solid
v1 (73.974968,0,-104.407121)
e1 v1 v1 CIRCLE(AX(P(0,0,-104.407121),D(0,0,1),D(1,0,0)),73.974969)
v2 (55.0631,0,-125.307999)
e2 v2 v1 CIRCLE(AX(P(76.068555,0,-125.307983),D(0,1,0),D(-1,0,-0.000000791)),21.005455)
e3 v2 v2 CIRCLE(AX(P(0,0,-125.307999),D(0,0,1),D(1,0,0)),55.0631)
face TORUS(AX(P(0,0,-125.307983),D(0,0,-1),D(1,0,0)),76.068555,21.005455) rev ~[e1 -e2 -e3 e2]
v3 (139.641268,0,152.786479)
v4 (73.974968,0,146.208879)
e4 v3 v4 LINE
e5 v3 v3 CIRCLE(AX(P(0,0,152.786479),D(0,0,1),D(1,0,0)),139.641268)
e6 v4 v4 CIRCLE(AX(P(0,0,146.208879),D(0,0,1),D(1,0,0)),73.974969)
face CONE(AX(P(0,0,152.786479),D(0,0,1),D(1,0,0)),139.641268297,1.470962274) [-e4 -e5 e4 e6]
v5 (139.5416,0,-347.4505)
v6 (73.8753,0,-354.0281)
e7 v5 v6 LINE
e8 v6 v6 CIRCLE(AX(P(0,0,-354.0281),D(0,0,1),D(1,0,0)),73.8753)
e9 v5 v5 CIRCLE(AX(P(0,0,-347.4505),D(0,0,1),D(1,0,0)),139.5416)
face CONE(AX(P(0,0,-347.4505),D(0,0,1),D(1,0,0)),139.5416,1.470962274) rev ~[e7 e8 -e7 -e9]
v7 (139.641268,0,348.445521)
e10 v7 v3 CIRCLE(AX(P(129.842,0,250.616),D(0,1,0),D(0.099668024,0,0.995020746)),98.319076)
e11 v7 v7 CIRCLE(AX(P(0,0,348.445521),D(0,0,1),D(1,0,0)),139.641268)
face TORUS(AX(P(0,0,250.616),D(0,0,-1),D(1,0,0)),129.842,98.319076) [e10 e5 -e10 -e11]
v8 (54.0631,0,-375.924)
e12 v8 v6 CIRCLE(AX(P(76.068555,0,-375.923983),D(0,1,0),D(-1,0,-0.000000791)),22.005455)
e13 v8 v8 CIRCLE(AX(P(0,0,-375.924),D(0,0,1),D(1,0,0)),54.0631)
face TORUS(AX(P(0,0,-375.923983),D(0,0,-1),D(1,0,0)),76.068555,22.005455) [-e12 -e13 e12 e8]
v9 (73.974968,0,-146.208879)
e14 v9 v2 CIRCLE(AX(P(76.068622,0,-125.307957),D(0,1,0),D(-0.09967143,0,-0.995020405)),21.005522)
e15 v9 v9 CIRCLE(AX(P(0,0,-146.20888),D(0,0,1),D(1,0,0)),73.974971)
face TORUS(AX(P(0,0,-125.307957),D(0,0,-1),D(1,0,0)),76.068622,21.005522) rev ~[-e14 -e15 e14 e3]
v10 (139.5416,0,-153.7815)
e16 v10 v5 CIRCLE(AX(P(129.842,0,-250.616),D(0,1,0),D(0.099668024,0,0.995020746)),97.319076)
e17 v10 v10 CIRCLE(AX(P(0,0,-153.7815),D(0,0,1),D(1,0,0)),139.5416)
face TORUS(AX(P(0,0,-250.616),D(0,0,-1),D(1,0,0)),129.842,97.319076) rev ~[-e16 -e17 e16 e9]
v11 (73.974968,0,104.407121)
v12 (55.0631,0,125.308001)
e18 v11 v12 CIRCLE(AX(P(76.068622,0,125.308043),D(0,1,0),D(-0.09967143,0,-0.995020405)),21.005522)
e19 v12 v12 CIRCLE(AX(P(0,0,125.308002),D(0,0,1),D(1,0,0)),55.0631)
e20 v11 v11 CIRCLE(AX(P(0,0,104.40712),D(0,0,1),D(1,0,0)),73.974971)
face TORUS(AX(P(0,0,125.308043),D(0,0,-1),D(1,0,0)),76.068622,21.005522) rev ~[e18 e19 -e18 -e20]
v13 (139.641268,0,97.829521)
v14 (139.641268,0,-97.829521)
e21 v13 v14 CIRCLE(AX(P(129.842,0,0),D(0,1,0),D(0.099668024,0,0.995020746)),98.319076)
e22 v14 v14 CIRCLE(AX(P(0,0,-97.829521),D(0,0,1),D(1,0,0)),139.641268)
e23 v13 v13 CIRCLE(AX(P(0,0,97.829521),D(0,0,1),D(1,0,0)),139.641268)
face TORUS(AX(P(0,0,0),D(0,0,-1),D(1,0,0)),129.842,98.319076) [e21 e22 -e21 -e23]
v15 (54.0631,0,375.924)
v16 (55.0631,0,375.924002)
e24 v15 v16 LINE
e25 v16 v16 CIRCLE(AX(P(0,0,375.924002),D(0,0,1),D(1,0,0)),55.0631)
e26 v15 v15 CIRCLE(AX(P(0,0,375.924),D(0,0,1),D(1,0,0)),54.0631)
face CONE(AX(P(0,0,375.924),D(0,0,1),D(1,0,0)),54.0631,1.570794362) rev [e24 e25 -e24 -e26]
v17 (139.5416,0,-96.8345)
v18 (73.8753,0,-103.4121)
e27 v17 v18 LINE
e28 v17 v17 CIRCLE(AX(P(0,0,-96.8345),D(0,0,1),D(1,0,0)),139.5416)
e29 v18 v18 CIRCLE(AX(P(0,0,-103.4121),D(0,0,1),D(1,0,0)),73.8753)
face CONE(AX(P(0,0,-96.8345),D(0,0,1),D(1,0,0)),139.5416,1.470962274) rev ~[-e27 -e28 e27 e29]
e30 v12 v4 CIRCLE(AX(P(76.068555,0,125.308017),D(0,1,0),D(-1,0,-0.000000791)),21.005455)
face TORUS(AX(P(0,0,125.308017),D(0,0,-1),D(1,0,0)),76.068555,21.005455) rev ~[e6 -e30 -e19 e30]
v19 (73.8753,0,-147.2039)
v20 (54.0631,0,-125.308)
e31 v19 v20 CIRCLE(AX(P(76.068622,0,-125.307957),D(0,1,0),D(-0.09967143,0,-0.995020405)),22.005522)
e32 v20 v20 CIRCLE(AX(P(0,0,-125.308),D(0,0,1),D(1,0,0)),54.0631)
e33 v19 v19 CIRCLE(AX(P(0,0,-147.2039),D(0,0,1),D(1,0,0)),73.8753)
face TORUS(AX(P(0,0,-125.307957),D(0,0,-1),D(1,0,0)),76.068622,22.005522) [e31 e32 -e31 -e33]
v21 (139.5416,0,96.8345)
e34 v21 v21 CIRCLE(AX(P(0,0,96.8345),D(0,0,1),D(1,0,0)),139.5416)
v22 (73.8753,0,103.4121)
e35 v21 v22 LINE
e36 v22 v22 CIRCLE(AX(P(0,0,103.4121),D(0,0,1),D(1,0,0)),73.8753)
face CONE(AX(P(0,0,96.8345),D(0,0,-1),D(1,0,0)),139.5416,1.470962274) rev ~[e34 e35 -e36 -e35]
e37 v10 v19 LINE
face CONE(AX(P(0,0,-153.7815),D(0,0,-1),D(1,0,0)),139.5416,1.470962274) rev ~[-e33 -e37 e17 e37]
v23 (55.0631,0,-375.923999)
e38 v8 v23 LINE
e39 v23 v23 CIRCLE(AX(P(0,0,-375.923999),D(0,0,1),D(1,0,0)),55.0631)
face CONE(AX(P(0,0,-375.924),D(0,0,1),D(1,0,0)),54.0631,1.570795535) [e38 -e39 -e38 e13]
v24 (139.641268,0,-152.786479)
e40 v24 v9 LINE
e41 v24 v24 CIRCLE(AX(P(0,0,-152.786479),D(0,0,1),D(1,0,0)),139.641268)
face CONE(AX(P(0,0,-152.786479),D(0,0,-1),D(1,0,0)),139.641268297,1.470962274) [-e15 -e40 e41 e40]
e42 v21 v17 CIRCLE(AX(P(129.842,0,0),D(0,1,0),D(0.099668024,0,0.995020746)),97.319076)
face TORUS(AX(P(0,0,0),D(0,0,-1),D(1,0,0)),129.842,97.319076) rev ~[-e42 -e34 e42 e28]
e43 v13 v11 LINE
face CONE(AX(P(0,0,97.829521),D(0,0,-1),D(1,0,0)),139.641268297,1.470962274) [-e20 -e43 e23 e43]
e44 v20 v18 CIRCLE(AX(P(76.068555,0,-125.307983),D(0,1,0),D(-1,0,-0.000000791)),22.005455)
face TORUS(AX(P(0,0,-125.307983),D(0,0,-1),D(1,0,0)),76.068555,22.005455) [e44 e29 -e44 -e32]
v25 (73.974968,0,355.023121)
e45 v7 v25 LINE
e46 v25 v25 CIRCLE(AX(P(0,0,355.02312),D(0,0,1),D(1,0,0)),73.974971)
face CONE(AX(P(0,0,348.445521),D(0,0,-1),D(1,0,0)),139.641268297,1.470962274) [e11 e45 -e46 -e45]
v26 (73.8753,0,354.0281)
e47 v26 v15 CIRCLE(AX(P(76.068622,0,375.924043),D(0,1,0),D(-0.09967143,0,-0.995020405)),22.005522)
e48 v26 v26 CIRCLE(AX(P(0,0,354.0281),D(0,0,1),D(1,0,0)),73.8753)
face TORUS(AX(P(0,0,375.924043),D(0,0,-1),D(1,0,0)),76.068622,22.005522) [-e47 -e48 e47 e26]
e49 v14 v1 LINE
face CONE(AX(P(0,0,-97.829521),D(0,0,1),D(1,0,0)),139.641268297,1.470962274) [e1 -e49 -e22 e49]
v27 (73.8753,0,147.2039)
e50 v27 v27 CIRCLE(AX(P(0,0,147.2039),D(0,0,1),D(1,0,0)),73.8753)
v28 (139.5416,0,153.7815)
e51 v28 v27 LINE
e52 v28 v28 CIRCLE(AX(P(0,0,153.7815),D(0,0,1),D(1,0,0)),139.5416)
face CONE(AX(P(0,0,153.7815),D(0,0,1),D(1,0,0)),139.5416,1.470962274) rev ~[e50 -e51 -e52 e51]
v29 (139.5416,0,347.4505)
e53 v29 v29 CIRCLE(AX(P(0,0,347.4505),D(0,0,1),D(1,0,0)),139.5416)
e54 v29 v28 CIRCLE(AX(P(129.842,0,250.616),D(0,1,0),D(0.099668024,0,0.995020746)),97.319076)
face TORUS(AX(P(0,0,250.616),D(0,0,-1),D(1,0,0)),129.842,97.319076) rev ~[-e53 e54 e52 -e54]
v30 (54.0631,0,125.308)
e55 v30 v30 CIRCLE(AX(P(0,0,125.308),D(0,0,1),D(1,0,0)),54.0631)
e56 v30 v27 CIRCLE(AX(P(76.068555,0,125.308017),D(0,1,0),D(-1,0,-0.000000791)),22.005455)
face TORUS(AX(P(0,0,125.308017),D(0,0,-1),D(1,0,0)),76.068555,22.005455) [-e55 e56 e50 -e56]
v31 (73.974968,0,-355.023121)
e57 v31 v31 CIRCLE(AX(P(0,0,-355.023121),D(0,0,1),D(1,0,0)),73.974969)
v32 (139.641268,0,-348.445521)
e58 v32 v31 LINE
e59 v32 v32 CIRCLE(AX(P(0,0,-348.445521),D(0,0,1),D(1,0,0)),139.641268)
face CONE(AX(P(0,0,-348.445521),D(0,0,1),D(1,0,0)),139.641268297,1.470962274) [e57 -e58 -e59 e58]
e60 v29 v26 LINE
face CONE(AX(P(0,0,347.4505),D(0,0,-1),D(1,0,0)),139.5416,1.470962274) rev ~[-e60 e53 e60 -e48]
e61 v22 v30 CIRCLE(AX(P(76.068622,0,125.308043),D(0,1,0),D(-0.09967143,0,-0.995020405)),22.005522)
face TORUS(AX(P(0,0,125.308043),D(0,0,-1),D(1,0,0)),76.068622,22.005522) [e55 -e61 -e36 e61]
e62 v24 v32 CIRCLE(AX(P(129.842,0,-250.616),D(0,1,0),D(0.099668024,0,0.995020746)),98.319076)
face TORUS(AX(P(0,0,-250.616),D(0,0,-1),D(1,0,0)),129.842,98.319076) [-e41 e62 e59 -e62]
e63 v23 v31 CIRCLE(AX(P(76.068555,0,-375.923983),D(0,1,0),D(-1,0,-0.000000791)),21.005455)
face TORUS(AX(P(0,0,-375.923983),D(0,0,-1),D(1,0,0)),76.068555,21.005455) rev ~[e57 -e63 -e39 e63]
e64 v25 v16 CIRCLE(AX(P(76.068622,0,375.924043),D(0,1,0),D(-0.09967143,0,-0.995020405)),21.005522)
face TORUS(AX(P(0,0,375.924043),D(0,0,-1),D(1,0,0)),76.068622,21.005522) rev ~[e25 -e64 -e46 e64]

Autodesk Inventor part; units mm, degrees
ref_plane "YZ Plane" through (0, 0, 0) normal (1, 0, 0) x (0, 1, 0)
ref_plane "XZ Plane" through (0, 0, 0) normal (0, 1, 0) x (-1, 0, 0)
ref_plane "XY Plane" through (0, 0, 0) normal (0, 0, 1) x (1, 0, 0)
sketch "Sketch1" plane through (0, 0, 0) normal (0, 1, 0) x (-1, 0, 0)
  arc A0 (-139.5416, 96.8345) -> (-139.5416, -96.8345) centre (-129.842, 0) ccw
  arc A1 (-54.0631, -125.308) -> (-73.8753, -103.4121) centre (-76.0686, -125.308) ccw
  line L0 (-139.5416, -96.8345) -> (-73.8753, -103.4121)
  line L1 (-139.5416, 96.8345) -> (-73.8753, 103.4121)
  arc A2 (-73.8753, 103.4121) -> (-54.0631, 125.308) centre (-76.0686, 125.308) ccw
  line L2 (-54.0631, -125.308) -> (-54.0631, -154.6881) construction
  line L3 (-54.0631, 125.308) -> (-54.0631, 163.9201) construction
  line L4 (0, -218.4097) -> (0, 227.6417) projected
  point P0 (0, 0)
  point P1 (-227.161, 0)
  dimension "d0" = 22.0055
  dimension "d2" = 250.616
  dimension "d3" = 227.161
surface revolve "RevolutionSrf1" sketch "Sketch1" angle 360 about axis through (0, 0, -10) along (0, 0, 1) shown no curves A1 L0 A0 L1 A2
thicken "Thicken1" operation new thickness 1 both sides no extend neighbours no toward (-0.5666588, -0.8236218, -0.0233465) faces at (-128.7428, -187.1239, -2.2721) (-114.3989, 50.251, -98.2961) (21.8674, -66.8564, -104.0607) (-114.3989, 50.251, 98.2961) (21.8674, -66.8564, 104.0607)
pattern_linear "Rectangular Pattern1" count 3 spacing 250.616 along (0, 0, 1) first direction both ways yes
properties part number "Lcavity84"
